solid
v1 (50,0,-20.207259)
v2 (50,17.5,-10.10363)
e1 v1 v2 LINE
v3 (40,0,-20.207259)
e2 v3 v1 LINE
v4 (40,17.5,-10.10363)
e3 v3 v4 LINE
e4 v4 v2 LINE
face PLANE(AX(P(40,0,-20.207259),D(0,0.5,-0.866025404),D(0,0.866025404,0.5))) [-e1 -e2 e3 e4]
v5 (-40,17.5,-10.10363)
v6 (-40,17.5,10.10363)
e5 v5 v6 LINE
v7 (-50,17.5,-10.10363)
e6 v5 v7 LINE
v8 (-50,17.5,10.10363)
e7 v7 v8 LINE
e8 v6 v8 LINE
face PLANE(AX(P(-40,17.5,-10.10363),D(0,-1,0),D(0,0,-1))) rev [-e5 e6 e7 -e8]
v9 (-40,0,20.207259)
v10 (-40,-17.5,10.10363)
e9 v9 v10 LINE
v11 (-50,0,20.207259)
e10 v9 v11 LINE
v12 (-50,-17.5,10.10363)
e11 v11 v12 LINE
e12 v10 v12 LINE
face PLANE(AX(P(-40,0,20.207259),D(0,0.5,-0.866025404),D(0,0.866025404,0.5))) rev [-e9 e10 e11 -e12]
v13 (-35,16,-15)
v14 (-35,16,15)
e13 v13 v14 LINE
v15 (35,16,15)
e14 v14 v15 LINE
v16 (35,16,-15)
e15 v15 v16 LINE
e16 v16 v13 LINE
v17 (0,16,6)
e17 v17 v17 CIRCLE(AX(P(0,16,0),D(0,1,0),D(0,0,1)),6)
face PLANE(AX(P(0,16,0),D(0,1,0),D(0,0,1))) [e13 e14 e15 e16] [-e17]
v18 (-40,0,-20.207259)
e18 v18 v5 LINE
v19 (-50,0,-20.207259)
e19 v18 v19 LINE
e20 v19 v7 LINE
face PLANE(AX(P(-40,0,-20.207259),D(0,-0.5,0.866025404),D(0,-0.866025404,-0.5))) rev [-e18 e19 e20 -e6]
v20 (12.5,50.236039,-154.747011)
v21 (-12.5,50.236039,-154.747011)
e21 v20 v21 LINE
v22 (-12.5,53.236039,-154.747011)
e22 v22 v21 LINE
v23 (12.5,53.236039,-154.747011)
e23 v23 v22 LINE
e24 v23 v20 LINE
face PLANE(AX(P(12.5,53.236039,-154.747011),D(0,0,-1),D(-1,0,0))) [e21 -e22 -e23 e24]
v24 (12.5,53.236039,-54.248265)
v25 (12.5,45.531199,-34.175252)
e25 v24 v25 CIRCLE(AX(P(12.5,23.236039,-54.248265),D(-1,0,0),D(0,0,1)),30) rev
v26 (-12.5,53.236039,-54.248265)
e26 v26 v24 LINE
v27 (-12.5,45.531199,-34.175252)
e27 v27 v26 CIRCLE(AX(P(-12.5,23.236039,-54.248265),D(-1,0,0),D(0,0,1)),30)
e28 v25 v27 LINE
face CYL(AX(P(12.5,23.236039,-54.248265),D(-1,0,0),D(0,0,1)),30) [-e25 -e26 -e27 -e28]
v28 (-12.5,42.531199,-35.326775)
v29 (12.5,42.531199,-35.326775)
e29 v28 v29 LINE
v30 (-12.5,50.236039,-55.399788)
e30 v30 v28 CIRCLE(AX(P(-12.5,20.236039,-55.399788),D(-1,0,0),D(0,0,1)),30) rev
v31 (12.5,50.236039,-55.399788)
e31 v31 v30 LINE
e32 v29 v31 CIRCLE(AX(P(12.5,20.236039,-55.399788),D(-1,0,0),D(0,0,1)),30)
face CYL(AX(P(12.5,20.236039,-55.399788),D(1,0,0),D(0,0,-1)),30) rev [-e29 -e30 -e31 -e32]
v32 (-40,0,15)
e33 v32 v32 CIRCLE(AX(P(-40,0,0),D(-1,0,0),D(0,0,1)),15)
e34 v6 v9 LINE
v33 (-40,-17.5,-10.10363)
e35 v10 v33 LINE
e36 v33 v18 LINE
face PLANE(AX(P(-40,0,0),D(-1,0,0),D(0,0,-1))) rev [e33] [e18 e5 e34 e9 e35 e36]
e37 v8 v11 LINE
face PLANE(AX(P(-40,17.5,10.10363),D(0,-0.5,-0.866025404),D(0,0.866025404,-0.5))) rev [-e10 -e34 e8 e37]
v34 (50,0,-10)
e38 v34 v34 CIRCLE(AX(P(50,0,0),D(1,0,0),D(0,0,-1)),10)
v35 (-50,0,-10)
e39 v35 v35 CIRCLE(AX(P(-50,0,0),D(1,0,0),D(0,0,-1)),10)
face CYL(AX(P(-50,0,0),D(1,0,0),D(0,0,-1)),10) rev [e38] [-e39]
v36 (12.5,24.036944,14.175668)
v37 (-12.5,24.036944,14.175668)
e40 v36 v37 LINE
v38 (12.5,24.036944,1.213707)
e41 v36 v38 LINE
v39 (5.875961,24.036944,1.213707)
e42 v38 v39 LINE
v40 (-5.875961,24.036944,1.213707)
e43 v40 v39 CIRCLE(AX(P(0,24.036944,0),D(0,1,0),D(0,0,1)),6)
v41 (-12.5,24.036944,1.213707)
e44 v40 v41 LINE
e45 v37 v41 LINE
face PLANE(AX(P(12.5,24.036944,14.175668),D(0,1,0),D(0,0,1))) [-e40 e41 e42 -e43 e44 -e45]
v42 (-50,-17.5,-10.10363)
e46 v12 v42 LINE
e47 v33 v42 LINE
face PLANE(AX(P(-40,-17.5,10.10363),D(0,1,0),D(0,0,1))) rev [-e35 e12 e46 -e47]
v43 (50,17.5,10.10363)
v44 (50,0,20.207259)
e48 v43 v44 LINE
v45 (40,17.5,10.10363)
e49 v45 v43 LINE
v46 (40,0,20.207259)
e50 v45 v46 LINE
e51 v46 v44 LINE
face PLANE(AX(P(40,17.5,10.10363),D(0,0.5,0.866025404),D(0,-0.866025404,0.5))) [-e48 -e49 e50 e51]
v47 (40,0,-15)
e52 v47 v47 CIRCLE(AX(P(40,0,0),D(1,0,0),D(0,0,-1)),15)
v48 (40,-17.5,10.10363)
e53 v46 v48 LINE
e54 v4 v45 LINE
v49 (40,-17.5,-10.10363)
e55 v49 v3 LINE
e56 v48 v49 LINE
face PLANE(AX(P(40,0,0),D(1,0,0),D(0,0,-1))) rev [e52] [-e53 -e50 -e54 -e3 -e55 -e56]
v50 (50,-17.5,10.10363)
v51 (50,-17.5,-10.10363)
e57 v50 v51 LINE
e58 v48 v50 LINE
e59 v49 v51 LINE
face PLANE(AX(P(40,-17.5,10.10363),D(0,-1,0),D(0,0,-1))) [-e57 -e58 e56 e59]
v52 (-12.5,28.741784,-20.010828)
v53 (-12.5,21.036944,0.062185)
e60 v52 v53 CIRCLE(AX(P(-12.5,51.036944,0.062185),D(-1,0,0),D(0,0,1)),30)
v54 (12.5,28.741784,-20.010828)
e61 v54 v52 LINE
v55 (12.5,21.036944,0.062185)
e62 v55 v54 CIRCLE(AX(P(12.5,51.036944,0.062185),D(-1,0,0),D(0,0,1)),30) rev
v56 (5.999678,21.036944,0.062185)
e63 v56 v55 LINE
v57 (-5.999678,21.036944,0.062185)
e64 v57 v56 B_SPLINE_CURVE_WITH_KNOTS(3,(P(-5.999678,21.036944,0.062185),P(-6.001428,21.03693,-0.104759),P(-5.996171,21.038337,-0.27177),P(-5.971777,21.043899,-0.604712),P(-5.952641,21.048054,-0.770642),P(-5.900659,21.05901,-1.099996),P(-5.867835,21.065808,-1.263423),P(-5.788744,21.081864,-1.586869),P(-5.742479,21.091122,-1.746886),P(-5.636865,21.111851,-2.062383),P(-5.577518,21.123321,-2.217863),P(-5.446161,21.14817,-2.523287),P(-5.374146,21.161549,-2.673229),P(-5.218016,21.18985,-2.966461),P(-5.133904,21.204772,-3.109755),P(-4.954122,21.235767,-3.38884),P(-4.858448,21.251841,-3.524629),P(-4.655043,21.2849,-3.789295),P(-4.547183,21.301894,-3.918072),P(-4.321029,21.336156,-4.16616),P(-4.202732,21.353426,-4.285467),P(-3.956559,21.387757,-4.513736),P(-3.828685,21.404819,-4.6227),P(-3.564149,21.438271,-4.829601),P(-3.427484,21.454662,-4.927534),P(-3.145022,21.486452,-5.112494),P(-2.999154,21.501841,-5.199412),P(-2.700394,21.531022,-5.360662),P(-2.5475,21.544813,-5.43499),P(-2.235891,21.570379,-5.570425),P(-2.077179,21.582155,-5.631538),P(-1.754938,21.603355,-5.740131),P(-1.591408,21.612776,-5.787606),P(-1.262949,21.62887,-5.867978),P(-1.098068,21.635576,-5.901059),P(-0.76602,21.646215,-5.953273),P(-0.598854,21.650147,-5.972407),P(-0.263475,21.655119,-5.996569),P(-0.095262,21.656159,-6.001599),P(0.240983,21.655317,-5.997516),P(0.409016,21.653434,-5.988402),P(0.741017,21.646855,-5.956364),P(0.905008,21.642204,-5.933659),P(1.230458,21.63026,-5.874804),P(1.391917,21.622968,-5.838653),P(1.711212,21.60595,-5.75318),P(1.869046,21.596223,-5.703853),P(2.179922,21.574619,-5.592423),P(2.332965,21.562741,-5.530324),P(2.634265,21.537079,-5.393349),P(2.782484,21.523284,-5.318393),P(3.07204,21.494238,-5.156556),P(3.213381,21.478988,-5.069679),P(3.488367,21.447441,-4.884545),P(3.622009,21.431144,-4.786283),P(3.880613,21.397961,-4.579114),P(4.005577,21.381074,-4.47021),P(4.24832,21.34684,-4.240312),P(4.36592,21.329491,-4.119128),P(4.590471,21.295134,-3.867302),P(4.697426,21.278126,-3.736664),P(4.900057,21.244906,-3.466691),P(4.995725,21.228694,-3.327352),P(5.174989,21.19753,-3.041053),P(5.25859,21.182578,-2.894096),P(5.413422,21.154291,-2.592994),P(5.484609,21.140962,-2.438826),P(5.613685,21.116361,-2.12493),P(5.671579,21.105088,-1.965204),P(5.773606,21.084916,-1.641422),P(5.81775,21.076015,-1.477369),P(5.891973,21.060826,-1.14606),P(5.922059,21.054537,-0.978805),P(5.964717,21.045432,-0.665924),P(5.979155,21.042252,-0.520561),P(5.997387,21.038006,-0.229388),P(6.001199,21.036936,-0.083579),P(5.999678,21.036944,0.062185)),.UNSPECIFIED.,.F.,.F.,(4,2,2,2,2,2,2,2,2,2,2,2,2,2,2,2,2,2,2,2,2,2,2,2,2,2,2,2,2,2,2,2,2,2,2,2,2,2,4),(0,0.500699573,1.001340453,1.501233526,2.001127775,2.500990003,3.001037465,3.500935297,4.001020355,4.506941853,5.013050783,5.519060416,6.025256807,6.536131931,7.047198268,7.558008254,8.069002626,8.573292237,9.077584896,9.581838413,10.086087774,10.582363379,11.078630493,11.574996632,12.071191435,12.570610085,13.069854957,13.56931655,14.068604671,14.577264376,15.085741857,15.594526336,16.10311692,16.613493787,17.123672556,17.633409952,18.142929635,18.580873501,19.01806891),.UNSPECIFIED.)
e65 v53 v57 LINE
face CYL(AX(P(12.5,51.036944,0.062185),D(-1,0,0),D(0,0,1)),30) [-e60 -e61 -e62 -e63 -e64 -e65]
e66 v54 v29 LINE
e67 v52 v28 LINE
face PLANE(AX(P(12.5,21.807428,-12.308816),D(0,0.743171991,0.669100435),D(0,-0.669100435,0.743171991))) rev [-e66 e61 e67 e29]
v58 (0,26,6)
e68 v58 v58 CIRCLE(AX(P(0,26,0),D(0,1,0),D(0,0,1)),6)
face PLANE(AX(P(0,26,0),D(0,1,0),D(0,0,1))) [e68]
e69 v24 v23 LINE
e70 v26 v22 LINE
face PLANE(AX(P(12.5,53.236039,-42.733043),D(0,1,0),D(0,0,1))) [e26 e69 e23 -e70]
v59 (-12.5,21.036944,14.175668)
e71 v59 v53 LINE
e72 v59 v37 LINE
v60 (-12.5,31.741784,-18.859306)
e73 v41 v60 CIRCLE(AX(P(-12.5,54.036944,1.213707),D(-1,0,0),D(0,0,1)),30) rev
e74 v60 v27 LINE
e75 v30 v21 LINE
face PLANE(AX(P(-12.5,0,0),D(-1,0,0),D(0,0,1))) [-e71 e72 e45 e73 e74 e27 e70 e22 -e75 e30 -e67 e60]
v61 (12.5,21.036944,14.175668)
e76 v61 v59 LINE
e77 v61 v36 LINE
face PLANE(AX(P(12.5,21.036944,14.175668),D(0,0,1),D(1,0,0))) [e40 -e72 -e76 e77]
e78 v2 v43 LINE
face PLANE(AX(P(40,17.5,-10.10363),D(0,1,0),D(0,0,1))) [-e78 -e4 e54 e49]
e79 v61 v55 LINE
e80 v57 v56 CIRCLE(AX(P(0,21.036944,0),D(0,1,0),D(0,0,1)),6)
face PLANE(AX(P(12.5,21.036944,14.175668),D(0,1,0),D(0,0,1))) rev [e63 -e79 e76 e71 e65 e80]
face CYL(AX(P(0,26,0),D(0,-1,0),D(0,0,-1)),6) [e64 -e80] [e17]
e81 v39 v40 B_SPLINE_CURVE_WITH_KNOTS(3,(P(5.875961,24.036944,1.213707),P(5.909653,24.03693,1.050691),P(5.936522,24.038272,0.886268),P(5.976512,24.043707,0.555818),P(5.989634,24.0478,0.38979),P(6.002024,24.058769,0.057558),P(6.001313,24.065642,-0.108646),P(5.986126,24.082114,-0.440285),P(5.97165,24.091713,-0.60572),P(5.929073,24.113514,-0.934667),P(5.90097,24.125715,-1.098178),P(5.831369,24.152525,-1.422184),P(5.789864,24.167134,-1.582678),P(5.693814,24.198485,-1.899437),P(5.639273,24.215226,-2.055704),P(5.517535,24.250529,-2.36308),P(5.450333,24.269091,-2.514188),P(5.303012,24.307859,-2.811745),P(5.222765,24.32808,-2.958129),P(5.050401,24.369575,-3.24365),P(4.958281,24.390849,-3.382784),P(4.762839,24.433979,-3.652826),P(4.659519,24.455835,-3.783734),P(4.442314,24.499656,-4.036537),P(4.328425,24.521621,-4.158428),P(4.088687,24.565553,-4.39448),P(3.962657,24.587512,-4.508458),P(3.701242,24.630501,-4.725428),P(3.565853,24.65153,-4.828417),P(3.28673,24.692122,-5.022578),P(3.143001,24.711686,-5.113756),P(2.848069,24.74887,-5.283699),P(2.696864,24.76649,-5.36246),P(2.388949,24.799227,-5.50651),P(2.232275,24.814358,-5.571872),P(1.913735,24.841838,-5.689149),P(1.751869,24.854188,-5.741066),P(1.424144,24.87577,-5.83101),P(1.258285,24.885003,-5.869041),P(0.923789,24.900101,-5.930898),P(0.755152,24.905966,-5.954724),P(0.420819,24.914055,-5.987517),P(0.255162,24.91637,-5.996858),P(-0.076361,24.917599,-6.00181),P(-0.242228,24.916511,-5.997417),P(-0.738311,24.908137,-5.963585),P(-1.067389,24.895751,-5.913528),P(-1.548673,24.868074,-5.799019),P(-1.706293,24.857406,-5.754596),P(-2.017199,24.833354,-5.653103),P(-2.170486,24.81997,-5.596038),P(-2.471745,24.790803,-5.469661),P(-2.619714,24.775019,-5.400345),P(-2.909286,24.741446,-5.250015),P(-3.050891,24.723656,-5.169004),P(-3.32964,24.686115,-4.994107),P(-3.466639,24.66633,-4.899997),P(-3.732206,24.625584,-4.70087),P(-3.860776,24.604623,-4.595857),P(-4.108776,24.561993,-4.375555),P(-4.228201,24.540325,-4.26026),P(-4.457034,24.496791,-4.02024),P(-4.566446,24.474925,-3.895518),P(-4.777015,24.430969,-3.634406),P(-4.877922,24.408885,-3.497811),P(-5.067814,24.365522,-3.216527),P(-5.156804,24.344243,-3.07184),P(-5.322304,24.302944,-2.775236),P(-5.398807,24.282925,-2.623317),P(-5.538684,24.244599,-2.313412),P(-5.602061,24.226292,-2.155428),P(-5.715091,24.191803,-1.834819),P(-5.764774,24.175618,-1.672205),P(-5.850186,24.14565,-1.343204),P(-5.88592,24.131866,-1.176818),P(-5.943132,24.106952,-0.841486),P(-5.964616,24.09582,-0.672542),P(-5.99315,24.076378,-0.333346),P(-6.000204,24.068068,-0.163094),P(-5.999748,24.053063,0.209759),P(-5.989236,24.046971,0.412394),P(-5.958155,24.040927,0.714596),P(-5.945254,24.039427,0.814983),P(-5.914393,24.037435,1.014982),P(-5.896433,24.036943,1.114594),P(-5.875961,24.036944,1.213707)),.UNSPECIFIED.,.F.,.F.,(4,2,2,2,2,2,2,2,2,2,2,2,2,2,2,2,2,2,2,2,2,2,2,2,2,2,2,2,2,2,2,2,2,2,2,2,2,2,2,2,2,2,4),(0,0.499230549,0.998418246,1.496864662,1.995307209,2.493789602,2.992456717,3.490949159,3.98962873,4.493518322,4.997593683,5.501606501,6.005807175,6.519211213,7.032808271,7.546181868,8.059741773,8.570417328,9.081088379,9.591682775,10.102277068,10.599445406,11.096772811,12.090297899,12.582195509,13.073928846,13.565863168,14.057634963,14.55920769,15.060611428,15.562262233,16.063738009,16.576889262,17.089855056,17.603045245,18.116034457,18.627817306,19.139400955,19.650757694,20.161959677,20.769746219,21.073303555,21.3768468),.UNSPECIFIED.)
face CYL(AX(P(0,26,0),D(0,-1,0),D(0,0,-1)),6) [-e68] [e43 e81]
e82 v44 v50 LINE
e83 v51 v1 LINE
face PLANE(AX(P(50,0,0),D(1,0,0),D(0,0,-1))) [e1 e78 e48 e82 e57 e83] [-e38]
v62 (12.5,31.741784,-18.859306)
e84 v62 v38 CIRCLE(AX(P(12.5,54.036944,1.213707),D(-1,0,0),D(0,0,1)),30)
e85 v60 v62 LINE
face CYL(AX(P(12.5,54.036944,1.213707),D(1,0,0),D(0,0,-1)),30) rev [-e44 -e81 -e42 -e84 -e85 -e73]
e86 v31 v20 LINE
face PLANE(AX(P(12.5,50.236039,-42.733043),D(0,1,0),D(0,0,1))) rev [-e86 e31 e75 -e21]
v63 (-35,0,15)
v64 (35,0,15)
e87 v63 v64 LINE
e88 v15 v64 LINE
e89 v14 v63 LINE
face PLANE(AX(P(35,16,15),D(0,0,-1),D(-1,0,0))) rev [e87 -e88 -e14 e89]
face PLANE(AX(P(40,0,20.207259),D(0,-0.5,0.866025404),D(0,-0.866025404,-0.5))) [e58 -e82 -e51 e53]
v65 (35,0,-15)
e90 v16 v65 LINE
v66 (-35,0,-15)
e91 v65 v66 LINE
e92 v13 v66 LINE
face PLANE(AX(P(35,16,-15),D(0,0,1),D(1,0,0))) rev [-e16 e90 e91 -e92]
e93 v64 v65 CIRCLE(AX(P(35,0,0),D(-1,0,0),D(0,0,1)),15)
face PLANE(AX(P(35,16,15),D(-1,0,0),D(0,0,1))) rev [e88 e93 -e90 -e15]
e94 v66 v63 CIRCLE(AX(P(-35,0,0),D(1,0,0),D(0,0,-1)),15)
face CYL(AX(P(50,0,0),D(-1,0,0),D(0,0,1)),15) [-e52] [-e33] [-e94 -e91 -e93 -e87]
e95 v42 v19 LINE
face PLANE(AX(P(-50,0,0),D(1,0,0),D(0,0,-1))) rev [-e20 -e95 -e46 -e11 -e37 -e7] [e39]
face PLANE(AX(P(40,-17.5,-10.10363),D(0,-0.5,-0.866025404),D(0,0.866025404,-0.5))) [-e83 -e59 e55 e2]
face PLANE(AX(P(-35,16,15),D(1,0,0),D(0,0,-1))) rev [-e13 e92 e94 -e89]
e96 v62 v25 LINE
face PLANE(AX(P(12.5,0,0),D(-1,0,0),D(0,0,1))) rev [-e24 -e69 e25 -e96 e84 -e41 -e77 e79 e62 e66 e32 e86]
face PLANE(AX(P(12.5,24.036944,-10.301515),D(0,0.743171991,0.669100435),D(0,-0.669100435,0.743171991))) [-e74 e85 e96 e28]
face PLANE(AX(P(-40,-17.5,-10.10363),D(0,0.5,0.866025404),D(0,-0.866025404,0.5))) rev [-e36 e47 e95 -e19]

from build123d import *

# Parameters (mm, degrees)
SKETCH1_R               = 15
SKETCH1_R_2             = 5
EXTRUDE_THIN1_DEPTH     = 50
SKETCH2_W               = 70
SKETCH2_H               = 30
BOSS_EXTRUDE1_DEPTH     = 16
SKETCH3_R               = 6
BOSS_EXTRUDE2_DEPTH     = 10
EXTRUDE_THIN2_DEPTH     = 12.5
FILLET1_R               = 30
BOSS_EXTRUDE3_DEPTH     = 10
CUT_EXTRUDE1_DEPTH      = 172.116081143
CUT_EXTRUDE1_DEPTH_BACK = 172.116081143
SKETCH6_R               = 10


with BuildPart() as part:
    # Sketch1 → Extrude-Thin1 (new, symmetric)
    with BuildSketch(Plane(origin=(0, 0, 0), x_dir=(0, 0, -1), z_dir=(1, 0, 0))):
        Circle(SKETCH1_R)
        Circle(SKETCH1_R_2, mode=Mode.SUBTRACT)
    extrude(amount=EXTRUDE_THIN1_DEPTH, both=True)

    # Sketch2 → Boss-Extrude1 (add)
    with BuildSketch(Plane(origin=(0, 0, 0), x_dir=(1, 0, 0), z_dir=(0, 1, 0))):
        Rectangle(SKETCH2_W, SKETCH2_H)
    extrude(amount=BOSS_EXTRUDE1_DEPTH)

    # Sketch3 → Boss-Extrude2 (add)
    with BuildSketch(Plane(origin=(0, 16, 0), x_dir=(1, 0, 0), z_dir=(0, 1, 0))):
        with Locations(Location((0, 0, 0), (0, 0, 270))):
            Circle(SKETCH3_R)
    extrude(amount=BOSS_EXTRUDE2_DEPTH)

    # Sketch4 → Extrude-Thin2 (add, symmetric)
    with BuildSketch(Plane(origin=(0, 0, 0), x_dir=(0, 0, -1), z_dir=(1, 0, 0))):
        Polygon((-14.175668382, 24.036944014), (10.301514998, 24.036944014), (42.733043078, 53.23603901), (154.74701088, 53.23603901), (154.74701088, 50.23603901), (43.884565313, 50.23603901), (11.453037232, 21.036944014), (-14.175668382, 21.036944014), align=None)
    extrude(amount=EXTRUDE_THIN2_DEPTH, both=True)

    # Fillet1
    # the kernel refuses this fillet: 30 mm, written as the material it adds along each edge
    with BuildSketch(Plane(origin=(12.5, 50.23603901, -43.884565313), x_dir=(0, -0.6691004351822665, 0.7431719906178524), z_dir=(-1, 0, 0))) as fillet1_piece_1:
        with BuildLine():
            CenterArc((FILLET1_R * 0.383840744794, -FILLET1_R), FILLET1_R, 90, 41.997673873)
            Line((-FILLET1_R * 0.285259690389, -FILLET1_R * 0.256828009382), (0, 0))
            Line((0, 0), (FILLET1_R * 0.383840744794, 0))
        make_face()
    extrude(amount=25)
    with BuildSketch(Plane(origin=(12.5, 24.036944014, -10.301514998), x_dir=(0, 0, 1), z_dir=(-1, 0, 0))) as fillet1_piece_2:
        with BuildLine():
            CenterArc((FILLET1_R * 0.383840744794, FILLET1_R), FILLET1_R, 228.002326127, 41.997673873)
            Line((-FILLET1_R * 0.285259690389, FILLET1_R * 0.256828009382), (0, 0))
            Line((0, 0), (FILLET1_R * 0.383840744794, 0))
        make_face()
    extrude(amount=25)
    # the kernel refuses this fillet: 30 mm, written as the material it takes off along each edge
    with BuildSketch(Plane(origin=(41.28805586, 53.23603901, -42.733043078), x_dir=(0, -0.6691004351822663, 0.7431719906178528), z_dir=(-1, 0, 0))) as fillet1_2_piece_1:
        with BuildLine():
            CenterArc((FILLET1_R * 0.383840744794, -FILLET1_R), FILLET1_R, 90, 41.997673873)
            Line((-FILLET1_R * 0.285259690389, -FILLET1_R * 0.256828009382), (0, 0))
            Line((0, 0), (FILLET1_R * 0.383840744794, 0))
        make_face()
    extrude(amount=82.576111719, mode=Mode.SUBTRACT)
    with BuildSketch(Plane(origin=(-41.28805586, 21.036944014, -11.453037232), x_dir=(0, 0, 1), z_dir=(1, 0, 0))) as fillet1_2_piece_2_section:
        with BuildLine():
            CenterArc((FILLET1_R * 0.383840744794, -FILLET1_R), FILLET1_R, 90, 41.997673873)
            Line((-FILLET1_R * 0.285259690389, -FILLET1_R * 0.256828009382), (0, 0))
            Line((0, 0), (FILLET1_R * 0.383840744794, 0))
        make_face()
    fillet1_2_piece_2 = extrude(amount=82.576111719, mode=Mode.PRIVATE)
    fillet1_2_piece_2 = fillet1_2_piece_2 - Plane(origin=(0, 22.678661346, 0), x_dir=(0, 0, 1), z_dir=(0, -1, 0)) * Cylinder(6, 212, mode=Mode.PRIVATE)
    add(fillet1_2_piece_2, mode=Mode.SUBTRACT)

    # Sketch5 → Boss-Extrude3 (add)
    with BuildSketch(Plane(origin=(50, 0, 0), x_dir=(0, 0, -1), z_dir=(1, 0, 0))):
        Polygon((-20.207259422, 0), (-10.103629711, -17.5), (10.103629711, -17.5), (20.207259422, 0), (10.103629711, 17.5), (-10.103629711, 17.5), align=None)
    boss_extrude3 = extrude(amount=-BOSS_EXTRUDE3_DEPTH)

    # Mirror1: Boss-Extrude3 across plane
    add(boss_extrude3.mirror(Plane(origin=(0, 0, 0), x_dir=(0, 0, 1), z_dir=(1, 0, 0))))

    # Sketch6 → Cut-Extrude1 (cut, two sides: drawn at the far end of the back side and taken through both)
    with BuildSketch(Plane(origin=(0, 0, 0), x_dir=(0, 0, -1), z_dir=(1, 0, 0)).offset(-CUT_EXTRUDE1_DEPTH_BACK)):
        Circle(SKETCH6_R)
    extrude(amount=CUT_EXTRUDE1_DEPTH + CUT_EXTRUDE1_DEPTH_BACK, mode=Mode.SUBTRACT)


solid = part.part
